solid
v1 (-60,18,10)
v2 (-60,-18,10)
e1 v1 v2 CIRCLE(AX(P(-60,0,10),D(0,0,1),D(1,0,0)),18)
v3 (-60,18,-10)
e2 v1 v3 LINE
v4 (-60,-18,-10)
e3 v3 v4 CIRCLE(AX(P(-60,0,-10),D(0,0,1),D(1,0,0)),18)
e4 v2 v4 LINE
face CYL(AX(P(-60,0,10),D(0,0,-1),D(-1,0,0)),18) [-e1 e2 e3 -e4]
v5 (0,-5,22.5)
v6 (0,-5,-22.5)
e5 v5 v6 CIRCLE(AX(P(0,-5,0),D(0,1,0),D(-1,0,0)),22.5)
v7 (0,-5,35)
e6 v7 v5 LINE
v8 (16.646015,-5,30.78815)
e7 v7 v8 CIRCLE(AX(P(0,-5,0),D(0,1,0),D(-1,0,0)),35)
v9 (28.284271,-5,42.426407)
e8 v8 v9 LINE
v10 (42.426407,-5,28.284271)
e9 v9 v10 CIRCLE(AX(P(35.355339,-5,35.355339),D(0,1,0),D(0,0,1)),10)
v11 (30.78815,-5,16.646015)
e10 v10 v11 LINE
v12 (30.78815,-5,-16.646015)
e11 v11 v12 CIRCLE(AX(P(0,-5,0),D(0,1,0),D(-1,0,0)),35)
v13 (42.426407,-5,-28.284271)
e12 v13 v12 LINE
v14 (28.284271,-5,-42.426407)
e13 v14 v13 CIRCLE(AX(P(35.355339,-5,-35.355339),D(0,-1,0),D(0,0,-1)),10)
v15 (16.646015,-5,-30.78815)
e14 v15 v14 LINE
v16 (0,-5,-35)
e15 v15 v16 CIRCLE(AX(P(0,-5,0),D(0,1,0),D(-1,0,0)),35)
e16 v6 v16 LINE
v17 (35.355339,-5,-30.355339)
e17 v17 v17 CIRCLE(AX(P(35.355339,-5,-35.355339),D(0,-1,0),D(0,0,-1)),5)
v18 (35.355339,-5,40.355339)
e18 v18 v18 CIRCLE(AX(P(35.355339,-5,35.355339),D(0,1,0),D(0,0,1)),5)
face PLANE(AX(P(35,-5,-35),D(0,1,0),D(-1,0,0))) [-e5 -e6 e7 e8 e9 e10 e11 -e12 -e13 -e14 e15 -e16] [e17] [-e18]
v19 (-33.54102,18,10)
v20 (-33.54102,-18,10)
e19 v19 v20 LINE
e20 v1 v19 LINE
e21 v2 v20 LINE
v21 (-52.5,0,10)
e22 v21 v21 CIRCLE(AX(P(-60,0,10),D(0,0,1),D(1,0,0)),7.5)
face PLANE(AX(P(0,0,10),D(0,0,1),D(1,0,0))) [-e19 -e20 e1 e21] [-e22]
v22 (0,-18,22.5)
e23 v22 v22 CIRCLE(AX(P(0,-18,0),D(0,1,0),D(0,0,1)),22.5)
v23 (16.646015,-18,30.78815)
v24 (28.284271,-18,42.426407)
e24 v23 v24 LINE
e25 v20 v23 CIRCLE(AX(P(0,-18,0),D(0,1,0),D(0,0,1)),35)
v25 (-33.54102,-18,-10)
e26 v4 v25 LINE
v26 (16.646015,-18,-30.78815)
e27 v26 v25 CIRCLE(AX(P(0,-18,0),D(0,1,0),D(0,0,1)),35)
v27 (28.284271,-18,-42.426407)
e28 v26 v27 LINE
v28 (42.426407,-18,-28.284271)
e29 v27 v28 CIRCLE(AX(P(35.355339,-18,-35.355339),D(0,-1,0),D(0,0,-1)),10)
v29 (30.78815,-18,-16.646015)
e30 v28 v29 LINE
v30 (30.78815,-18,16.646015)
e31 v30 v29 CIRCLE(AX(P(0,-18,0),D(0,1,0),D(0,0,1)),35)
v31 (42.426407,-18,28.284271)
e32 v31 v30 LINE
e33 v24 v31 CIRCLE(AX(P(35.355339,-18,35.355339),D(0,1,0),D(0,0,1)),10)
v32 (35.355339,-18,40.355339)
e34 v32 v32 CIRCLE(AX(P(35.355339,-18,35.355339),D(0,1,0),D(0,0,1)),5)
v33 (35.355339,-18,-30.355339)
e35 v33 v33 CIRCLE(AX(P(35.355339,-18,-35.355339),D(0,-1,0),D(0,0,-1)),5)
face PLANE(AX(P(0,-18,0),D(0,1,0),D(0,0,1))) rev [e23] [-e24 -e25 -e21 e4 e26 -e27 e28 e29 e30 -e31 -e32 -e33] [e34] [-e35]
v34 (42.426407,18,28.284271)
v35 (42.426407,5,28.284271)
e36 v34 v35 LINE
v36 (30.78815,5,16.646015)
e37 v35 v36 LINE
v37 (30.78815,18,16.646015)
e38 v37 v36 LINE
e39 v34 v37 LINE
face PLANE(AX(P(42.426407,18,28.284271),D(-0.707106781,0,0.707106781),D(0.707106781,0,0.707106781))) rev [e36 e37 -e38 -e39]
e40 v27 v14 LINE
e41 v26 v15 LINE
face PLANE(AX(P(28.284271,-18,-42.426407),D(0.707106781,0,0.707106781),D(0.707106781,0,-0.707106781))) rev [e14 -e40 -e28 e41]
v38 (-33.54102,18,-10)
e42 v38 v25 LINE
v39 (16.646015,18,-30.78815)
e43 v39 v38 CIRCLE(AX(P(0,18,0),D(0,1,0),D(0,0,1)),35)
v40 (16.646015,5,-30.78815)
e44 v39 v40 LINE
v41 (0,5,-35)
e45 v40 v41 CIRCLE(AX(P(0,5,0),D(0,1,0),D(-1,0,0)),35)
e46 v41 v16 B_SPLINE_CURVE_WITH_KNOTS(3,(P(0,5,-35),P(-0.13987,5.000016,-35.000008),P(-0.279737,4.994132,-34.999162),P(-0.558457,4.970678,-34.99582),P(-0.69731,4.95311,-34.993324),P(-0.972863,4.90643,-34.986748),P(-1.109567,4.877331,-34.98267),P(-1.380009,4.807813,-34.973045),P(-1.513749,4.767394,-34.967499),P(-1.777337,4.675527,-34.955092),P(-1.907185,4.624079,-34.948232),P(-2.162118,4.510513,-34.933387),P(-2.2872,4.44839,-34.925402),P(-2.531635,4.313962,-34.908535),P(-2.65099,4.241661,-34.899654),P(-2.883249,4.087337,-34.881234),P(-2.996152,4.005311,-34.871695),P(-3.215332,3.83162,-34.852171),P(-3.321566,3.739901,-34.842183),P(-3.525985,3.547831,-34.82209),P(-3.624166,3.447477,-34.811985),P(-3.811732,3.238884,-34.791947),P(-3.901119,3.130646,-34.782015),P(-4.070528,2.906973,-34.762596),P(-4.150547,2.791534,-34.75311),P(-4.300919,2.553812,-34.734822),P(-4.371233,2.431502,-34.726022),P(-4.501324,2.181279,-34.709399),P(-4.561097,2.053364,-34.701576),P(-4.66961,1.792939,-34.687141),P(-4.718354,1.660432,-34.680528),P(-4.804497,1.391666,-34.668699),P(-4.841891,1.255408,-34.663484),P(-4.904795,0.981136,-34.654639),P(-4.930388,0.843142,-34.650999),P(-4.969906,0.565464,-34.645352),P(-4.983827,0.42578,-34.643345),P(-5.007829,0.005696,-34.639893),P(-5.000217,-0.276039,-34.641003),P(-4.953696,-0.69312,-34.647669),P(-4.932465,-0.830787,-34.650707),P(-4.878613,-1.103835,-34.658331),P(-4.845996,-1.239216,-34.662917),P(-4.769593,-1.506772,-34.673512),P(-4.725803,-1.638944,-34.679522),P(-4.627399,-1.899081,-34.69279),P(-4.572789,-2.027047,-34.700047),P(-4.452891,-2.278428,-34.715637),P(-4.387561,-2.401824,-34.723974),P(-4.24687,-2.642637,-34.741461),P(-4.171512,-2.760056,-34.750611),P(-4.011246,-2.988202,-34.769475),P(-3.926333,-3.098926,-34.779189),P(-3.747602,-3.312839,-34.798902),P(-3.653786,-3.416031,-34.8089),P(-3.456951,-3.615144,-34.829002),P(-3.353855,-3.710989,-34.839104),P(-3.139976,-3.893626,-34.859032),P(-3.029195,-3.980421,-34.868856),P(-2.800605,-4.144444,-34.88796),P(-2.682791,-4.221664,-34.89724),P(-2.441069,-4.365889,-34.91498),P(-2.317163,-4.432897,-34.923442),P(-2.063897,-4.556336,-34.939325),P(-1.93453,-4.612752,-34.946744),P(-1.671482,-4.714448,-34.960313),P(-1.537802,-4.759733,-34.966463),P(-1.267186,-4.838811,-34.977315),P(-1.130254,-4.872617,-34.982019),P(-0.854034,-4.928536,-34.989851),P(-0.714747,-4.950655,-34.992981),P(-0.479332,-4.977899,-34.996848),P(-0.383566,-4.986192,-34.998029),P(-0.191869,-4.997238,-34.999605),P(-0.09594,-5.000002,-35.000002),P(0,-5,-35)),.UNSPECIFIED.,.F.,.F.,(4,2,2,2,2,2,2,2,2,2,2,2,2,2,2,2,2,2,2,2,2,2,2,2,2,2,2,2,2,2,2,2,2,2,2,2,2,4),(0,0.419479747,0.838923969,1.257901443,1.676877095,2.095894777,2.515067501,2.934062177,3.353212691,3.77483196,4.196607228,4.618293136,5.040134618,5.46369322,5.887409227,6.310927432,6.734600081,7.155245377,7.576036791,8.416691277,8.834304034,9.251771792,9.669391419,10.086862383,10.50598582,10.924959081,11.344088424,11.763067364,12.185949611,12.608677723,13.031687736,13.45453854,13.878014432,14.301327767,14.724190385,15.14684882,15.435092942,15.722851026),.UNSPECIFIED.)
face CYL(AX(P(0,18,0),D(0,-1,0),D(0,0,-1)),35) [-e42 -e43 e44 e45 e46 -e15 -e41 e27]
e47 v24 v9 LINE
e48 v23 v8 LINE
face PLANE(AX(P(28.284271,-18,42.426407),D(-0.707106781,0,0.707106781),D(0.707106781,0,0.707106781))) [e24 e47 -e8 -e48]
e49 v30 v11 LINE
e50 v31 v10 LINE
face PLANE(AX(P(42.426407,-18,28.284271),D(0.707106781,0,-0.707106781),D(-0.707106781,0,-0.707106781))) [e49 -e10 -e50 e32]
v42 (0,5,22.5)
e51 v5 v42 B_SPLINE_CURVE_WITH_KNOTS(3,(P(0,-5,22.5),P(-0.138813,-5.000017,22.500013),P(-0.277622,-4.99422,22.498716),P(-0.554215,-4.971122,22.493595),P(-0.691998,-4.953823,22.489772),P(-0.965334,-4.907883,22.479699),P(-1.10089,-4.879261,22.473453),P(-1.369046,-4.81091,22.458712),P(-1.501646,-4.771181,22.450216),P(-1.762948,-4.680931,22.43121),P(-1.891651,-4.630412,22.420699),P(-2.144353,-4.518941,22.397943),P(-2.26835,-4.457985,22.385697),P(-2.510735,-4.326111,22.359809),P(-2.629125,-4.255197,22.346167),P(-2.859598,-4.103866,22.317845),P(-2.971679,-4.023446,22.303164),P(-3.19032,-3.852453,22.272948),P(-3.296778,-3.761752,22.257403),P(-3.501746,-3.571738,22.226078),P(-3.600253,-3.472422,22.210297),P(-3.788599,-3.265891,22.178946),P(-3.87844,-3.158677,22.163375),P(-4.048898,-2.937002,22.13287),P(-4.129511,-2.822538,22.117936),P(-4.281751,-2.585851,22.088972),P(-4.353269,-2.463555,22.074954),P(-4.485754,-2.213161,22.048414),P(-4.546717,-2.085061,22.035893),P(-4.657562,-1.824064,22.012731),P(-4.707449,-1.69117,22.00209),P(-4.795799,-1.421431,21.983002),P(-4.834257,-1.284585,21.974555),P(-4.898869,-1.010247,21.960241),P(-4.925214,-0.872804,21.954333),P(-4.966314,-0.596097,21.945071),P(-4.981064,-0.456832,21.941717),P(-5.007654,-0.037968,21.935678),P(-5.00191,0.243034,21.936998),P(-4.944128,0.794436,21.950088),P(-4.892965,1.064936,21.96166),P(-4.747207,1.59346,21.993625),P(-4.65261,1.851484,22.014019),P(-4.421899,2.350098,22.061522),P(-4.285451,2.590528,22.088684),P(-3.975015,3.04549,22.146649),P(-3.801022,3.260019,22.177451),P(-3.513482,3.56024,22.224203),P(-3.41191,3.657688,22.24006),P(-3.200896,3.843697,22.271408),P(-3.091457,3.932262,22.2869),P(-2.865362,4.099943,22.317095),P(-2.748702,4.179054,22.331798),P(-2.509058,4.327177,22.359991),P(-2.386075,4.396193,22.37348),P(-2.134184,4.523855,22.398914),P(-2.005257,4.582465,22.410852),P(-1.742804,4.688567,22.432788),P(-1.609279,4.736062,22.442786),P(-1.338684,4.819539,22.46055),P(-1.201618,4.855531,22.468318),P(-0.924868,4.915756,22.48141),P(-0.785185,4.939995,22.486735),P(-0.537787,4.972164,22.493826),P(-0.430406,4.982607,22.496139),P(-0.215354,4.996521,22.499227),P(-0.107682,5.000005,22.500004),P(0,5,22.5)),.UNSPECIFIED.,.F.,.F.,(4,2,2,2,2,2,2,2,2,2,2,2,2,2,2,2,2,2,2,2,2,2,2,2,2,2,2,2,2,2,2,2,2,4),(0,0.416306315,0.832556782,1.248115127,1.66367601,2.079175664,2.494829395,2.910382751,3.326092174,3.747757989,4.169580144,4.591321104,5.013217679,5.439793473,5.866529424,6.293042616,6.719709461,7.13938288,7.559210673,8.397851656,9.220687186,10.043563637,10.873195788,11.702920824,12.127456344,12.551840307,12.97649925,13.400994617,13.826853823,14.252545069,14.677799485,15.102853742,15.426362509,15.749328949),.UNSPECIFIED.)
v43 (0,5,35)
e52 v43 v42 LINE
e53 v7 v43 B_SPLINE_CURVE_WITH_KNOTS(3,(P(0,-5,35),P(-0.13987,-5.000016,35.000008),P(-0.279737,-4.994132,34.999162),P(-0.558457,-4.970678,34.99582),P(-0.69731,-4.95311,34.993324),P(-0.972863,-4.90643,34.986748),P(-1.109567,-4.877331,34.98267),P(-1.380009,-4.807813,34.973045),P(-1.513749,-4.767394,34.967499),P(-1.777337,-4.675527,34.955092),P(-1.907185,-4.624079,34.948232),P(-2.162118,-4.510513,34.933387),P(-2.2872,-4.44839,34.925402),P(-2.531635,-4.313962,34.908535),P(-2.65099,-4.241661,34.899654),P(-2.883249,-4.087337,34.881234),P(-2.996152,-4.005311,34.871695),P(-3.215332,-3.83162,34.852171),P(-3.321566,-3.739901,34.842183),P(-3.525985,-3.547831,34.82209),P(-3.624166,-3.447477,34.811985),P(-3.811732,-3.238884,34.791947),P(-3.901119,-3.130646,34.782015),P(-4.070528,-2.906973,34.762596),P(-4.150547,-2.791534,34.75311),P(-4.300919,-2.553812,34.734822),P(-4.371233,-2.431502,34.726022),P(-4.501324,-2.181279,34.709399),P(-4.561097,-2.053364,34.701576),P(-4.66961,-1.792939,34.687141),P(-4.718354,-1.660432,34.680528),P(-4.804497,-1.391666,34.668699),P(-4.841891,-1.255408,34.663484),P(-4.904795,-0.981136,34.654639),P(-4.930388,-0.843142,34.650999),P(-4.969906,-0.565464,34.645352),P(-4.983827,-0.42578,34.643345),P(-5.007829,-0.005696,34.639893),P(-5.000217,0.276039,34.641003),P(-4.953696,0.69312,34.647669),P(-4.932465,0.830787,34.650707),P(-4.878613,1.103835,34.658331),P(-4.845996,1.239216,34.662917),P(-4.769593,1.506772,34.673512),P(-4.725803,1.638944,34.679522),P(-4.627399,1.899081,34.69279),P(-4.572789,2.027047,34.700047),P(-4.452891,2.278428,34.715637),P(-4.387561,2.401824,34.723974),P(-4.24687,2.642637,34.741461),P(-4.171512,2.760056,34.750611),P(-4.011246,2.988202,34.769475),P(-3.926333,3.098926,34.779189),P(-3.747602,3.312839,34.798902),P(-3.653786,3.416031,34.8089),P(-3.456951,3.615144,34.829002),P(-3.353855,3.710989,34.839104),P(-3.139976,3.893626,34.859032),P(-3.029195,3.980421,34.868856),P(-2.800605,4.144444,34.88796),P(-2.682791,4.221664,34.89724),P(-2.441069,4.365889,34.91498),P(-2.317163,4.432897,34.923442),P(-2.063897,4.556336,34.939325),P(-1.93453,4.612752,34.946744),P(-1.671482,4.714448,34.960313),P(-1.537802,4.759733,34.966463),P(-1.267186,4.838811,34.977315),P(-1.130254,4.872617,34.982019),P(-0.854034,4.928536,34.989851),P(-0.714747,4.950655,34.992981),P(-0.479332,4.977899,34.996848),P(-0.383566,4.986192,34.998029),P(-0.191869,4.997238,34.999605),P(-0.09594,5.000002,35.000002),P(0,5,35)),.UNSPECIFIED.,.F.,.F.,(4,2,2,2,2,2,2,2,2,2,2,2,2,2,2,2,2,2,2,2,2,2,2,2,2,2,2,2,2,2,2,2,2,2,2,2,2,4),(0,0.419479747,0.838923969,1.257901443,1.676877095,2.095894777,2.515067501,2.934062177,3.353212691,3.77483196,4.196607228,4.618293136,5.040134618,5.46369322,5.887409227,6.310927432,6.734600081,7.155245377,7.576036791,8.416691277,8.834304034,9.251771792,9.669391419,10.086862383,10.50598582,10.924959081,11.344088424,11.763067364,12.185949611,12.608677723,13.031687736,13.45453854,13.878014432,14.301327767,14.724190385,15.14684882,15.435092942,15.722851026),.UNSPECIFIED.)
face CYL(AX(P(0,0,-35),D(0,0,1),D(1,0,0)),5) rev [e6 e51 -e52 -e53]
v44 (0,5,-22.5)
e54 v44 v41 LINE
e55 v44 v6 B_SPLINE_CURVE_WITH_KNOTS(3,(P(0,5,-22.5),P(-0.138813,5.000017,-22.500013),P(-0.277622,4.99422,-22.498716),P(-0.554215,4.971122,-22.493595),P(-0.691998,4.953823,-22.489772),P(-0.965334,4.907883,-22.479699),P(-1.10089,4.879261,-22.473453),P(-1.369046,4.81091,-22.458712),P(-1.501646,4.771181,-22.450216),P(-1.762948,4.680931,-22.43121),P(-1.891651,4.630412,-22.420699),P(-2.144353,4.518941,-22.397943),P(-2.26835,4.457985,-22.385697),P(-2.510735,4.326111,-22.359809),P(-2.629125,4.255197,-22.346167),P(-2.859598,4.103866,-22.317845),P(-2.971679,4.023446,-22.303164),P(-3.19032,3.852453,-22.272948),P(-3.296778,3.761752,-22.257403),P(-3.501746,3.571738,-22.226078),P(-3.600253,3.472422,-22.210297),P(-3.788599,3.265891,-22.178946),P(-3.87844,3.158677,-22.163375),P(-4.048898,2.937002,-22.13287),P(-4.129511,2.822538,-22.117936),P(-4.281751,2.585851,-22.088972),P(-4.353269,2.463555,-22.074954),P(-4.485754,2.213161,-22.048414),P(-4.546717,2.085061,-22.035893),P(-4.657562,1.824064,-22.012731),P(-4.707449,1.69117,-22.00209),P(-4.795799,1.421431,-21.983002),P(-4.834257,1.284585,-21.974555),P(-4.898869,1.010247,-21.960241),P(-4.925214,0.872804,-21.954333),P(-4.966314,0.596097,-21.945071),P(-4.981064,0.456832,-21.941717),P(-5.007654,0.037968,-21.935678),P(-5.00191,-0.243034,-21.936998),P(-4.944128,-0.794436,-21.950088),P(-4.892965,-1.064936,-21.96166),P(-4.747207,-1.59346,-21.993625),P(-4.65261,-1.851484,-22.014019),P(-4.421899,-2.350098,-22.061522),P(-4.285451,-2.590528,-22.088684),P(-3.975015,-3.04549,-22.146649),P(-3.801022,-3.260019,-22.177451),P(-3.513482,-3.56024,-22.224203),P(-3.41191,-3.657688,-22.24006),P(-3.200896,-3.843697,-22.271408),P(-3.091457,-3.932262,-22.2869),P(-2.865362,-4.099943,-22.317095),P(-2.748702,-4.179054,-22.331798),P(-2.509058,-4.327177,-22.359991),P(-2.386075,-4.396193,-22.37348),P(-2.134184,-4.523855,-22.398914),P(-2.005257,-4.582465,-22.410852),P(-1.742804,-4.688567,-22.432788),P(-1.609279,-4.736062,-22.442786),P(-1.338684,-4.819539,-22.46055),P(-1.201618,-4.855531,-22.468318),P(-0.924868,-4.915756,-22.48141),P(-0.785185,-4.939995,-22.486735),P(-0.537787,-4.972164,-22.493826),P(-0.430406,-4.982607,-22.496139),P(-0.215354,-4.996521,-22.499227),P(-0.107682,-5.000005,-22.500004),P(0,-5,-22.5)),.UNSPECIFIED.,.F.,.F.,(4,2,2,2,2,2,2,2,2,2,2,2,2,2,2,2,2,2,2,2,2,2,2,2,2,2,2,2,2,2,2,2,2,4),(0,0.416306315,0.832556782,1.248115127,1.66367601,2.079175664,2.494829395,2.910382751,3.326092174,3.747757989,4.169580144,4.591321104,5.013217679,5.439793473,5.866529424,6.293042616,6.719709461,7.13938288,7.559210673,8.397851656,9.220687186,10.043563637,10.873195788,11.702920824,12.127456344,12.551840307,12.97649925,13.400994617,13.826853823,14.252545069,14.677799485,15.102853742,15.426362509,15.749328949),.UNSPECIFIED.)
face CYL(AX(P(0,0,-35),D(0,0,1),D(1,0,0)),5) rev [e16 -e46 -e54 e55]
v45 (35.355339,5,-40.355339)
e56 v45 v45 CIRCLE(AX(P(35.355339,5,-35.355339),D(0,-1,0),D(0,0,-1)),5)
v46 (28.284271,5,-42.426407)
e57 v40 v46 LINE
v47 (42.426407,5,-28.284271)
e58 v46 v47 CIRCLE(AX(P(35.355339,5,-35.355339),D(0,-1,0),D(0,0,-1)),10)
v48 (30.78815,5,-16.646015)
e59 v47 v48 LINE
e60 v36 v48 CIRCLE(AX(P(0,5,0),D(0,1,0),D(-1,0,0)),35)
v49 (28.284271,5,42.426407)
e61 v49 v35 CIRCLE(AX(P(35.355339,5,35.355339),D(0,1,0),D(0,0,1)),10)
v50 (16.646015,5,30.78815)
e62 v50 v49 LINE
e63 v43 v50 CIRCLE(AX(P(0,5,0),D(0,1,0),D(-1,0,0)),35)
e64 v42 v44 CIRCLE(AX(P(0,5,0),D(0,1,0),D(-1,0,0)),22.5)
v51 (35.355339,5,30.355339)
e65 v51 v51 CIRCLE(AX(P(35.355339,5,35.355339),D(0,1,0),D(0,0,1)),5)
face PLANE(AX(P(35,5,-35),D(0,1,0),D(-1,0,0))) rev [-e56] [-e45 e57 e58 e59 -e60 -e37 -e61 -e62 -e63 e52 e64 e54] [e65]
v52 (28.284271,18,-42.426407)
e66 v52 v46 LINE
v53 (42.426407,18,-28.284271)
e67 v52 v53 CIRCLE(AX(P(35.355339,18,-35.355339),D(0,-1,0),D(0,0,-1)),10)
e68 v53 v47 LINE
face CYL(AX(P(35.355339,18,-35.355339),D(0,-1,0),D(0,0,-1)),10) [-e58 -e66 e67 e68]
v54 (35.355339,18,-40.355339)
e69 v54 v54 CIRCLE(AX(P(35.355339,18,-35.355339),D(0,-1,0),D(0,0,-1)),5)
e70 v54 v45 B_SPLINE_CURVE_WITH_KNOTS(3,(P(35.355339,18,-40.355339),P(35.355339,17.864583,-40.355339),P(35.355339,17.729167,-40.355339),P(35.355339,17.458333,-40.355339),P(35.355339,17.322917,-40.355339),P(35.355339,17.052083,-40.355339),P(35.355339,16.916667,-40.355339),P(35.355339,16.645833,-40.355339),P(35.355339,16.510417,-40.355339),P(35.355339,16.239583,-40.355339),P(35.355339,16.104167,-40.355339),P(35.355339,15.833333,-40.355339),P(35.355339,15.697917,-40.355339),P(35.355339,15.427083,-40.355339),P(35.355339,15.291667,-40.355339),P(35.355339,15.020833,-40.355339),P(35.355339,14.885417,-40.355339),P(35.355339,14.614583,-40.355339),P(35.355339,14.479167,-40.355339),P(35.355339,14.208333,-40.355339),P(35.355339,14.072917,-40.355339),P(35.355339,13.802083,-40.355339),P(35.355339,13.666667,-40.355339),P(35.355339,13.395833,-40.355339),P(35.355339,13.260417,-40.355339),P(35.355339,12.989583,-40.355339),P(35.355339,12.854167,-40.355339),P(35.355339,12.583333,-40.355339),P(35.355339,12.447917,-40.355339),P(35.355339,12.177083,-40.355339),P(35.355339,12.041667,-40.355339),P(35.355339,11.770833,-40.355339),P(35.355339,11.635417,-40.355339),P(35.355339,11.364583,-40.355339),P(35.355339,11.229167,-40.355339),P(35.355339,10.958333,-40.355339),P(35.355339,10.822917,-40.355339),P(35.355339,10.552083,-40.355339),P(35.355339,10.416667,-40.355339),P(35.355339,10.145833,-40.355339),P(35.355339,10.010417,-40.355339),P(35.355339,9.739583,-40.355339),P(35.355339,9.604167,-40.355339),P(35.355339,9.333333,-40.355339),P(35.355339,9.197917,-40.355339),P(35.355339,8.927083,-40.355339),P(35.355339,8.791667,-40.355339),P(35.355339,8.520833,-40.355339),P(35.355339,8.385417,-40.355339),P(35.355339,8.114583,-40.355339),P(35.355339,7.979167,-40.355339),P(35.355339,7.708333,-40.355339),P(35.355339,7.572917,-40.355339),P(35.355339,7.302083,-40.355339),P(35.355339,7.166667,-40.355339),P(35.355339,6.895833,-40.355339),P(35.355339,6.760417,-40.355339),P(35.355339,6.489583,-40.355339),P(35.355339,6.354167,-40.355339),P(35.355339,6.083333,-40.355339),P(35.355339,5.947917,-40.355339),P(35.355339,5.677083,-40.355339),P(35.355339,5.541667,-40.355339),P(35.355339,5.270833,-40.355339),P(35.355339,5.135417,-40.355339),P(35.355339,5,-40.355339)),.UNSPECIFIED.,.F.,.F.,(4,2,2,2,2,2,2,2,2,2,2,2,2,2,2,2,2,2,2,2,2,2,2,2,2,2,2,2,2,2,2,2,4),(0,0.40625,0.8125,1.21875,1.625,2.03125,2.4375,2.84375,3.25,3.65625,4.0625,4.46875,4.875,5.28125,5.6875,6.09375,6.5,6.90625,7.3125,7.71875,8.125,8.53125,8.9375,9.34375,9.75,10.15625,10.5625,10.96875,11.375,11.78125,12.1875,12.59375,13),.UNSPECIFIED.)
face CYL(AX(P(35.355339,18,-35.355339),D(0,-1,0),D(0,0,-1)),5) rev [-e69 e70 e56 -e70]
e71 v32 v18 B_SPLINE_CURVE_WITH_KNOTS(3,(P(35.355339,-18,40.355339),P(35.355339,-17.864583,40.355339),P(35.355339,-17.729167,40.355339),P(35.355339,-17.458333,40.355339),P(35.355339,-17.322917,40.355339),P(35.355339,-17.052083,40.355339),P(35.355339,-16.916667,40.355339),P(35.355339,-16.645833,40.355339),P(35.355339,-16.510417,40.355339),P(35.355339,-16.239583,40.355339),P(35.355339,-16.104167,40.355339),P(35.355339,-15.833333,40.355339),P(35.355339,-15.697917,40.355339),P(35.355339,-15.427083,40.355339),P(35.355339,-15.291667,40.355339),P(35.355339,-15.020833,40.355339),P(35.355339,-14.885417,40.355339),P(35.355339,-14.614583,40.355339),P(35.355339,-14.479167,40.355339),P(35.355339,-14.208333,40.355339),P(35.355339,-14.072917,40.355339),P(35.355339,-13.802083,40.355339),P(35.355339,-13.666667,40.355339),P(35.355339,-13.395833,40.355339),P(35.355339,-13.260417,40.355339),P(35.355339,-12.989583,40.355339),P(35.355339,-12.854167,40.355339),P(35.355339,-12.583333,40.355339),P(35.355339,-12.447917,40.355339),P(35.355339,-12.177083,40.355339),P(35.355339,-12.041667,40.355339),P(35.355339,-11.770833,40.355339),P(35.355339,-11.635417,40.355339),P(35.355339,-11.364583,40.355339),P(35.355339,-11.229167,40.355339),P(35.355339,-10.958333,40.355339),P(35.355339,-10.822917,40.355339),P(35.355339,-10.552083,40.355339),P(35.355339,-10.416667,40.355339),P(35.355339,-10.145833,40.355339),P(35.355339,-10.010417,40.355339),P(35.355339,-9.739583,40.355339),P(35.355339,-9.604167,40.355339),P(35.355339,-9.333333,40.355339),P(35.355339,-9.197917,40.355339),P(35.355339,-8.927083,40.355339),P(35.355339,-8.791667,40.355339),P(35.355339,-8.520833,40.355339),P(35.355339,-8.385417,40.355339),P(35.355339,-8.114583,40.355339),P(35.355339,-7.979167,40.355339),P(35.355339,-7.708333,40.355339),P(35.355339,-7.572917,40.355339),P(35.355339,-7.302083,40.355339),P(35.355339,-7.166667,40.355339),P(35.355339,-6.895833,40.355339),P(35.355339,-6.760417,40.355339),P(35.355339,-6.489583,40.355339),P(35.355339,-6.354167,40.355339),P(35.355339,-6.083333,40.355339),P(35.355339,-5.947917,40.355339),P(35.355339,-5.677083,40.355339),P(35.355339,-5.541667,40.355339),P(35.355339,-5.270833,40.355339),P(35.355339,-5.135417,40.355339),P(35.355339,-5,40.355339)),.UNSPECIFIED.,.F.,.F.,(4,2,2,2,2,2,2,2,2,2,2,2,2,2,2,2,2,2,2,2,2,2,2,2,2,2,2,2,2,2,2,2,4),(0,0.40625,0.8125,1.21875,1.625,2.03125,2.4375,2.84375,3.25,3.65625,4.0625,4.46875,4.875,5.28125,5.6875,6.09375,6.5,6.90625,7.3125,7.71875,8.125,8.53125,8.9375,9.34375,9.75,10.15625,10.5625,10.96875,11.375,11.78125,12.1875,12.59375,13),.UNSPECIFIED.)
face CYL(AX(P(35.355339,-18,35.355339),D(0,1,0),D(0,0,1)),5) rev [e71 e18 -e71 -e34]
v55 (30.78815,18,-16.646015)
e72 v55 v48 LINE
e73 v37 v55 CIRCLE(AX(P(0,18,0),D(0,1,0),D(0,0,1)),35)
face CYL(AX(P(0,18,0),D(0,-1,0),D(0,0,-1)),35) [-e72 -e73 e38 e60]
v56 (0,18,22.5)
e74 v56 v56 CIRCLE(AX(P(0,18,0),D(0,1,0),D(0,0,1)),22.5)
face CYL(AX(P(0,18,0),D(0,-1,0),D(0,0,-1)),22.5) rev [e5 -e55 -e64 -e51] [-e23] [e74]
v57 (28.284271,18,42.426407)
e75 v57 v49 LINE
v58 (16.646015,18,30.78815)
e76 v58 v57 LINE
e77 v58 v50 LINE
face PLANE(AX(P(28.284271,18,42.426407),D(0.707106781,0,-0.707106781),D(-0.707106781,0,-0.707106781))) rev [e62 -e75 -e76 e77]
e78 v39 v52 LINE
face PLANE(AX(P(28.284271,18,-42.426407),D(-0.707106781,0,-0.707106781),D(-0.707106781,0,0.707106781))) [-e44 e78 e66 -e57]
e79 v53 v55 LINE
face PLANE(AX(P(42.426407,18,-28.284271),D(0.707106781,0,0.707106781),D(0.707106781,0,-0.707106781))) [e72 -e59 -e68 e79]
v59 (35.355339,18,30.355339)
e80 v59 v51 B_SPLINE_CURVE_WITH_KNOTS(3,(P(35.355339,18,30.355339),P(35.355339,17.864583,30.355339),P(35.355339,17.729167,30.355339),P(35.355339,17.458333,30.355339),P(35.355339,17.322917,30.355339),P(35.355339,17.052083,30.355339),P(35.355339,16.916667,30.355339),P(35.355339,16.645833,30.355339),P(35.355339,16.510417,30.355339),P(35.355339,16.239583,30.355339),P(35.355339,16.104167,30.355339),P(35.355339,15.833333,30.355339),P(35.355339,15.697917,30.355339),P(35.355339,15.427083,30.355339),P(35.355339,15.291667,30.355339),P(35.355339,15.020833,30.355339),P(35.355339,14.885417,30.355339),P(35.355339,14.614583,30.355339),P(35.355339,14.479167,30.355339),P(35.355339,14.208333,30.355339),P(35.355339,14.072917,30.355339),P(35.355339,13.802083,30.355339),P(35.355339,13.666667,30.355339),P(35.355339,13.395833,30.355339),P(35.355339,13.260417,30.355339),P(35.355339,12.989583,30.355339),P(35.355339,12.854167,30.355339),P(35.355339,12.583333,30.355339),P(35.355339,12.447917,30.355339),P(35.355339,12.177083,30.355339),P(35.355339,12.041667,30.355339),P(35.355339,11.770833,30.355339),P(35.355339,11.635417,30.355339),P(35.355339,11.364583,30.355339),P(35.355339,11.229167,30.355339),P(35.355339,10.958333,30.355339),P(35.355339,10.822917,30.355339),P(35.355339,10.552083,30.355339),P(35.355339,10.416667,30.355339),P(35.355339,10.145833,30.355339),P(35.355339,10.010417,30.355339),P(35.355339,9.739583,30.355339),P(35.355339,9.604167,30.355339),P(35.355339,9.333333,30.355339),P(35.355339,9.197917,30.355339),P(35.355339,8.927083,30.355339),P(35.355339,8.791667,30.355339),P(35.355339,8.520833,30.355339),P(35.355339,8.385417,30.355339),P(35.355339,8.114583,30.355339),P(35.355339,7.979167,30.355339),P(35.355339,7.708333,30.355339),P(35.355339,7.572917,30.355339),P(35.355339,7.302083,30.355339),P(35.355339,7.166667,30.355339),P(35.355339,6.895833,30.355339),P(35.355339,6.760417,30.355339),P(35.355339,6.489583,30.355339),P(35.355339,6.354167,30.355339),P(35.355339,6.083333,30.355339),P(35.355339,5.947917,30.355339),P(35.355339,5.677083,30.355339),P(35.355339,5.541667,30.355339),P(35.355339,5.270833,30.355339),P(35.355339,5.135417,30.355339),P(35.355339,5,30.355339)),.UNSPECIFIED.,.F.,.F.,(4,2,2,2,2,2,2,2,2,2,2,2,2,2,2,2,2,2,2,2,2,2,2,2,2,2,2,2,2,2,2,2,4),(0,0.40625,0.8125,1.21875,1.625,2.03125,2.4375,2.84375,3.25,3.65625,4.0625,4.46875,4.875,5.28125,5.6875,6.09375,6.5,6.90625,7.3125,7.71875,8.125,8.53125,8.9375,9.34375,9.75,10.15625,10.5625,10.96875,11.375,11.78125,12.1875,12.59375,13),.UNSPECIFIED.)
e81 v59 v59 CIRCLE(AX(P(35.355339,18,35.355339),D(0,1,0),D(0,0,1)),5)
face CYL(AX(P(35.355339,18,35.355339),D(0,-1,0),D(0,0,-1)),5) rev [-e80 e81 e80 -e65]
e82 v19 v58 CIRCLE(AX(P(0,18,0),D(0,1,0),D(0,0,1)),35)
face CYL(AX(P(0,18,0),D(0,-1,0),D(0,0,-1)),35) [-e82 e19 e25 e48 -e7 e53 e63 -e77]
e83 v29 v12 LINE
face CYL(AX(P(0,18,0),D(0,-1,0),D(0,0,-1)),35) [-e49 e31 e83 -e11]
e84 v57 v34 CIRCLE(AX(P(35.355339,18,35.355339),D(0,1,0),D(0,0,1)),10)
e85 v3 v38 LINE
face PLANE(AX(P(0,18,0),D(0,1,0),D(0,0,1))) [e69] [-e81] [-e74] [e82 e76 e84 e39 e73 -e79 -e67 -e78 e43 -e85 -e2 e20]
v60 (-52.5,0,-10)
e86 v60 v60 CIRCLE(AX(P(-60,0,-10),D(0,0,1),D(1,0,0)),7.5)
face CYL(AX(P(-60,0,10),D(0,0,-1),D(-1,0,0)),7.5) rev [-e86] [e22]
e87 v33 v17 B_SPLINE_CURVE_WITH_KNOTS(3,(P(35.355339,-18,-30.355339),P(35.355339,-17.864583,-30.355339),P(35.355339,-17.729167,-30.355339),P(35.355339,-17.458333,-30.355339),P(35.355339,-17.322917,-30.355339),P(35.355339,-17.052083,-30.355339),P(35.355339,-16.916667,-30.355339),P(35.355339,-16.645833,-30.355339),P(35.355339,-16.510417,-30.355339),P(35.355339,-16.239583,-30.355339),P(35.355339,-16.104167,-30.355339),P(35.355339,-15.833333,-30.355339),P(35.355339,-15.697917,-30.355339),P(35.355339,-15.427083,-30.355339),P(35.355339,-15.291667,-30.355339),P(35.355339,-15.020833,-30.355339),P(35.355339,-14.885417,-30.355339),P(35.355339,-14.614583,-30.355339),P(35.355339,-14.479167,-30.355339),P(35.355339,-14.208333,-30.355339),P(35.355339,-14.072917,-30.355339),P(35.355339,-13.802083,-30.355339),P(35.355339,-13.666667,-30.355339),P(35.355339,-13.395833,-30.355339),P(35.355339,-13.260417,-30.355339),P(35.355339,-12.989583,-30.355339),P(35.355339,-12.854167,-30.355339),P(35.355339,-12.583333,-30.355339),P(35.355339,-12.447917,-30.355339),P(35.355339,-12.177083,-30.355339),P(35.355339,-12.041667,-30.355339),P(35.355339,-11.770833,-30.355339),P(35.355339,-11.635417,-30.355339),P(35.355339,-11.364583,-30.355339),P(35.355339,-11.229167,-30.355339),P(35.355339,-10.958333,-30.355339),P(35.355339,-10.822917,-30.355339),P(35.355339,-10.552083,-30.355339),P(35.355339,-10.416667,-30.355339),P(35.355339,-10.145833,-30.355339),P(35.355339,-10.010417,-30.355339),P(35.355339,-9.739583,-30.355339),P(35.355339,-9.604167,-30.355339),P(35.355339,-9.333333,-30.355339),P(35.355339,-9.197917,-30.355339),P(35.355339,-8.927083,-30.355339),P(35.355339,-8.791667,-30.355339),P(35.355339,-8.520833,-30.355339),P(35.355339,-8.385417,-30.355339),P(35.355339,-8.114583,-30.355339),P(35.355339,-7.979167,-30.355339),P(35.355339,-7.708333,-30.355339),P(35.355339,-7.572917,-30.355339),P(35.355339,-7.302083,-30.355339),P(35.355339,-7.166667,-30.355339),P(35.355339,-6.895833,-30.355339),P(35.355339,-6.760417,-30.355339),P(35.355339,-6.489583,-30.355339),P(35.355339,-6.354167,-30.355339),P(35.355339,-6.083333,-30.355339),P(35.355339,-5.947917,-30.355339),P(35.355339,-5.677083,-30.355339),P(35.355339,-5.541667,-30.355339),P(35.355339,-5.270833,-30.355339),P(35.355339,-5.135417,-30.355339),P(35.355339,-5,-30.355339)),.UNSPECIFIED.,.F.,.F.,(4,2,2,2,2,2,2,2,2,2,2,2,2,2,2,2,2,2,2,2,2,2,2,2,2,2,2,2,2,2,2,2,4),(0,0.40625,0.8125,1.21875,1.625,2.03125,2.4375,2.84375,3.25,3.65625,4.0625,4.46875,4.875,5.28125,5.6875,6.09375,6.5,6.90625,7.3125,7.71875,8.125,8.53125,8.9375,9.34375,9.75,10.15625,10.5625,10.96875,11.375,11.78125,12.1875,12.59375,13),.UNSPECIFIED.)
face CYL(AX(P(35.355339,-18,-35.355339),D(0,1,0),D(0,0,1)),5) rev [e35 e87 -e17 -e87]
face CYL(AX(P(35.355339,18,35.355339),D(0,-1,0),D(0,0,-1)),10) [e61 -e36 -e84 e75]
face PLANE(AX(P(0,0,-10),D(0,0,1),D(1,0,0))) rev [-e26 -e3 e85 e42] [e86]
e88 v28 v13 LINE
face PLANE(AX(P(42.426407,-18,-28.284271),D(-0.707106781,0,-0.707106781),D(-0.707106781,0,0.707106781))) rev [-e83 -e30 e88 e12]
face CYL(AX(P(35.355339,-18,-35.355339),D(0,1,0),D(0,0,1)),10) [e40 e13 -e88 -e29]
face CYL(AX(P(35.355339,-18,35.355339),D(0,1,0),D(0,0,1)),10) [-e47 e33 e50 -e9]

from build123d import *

# Parameters (mm, degrees)
SKETCH1_R               = 35
SKETCH1_R_2             = 22.5
BOSS_EXTRUDE1_DEPTH     = 18
CUT_EXTRUDE1_DEPTH      = 53.668776329
CUT_EXTRUDE1_DEPTH_BACK = 53.668776329
SKETCH2_R               = 5
SKETCH2_W               = 35
SKETCH2_H               = 10
BOSS_EXTRUDE2_START     = 18
SKETCH3_R               = 5
BOSS_EXTRUDE2_DEPTH     = 13
MIRROR2_START           = 18
MIRROR2_COPY_1_SKETCH_R = 5
MIRROR2_COPY_1_DEPTH    = 13
BOSS_EXTRUDE4_DEPTH     = 10


with BuildPart() as part:
    # Sketch1 → Boss-Extrude1 (new, symmetric)
    with BuildSketch(Plane(origin=(0, 0, 0), x_dir=(1, 0, 0), z_dir=(0, 1, 0))):
        Circle(SKETCH1_R)
        Circle(SKETCH1_R_2, mode=Mode.SUBTRACT)
    extrude(amount=BOSS_EXTRUDE1_DEPTH, both=True)

    # Sketch2 → Cut-Extrude1 (cut, two sides: drawn at the far end of the back side and taken through both)
    with BuildSketch(Plane.XY.offset(-CUT_EXTRUDE1_DEPTH_BACK)):
        Circle(SKETCH2_R)
        with Locations((17.5, 0)):
            Rectangle(SKETCH2_W, SKETCH2_H)
    extrude(amount=CUT_EXTRUDE1_DEPTH + CUT_EXTRUDE1_DEPTH_BACK, mode=Mode.SUBTRACT)

    # Sketch3 → Boss-Extrude2 (add)
    with BuildSketch(Plane(origin=(0, 0, 0), x_dir=(1, 0, 0), z_dir=(0, 1, 0)).offset(BOSS_EXTRUDE2_START)):
        with BuildLine():
            Line((28.284271247, -42.426406871), (16.646014639, -30.788150263))
            ThreePointArc((16.646014639, -30.788150263), (24.748737342, -24.748737342), (30.788150263, -16.646014639))
            Line((30.788150263, -16.646014639), (42.426406871, -28.284271247))
            ThreePointArc((42.426406871, -28.284271247), (42.426406871, -42.426406871), (28.284271247, -42.426406871))
        make_face()
        with Locations((35.355339059, -35.355339059)):
            Circle(SKETCH3_R, mode=Mode.SUBTRACT)
    boss_extrude2 = extrude(amount=-BOSS_EXTRUDE2_DEPTH)

    # Mirror1: Boss-Extrude2 across plane
    add(boss_extrude2.mirror(Plane.XY))

    # Mirror2: Boss-Extrude2 across plane
    add(boss_extrude2.mirror(Plane.ZX))

    # Mirror2 copy 1 sketch → Mirror2 copy 1 (add)
    with BuildSketch(Plane.XZ.offset(MIRROR2_START)):
        with BuildLine():
            Line((28.284271247, -42.426406871), (16.646014639, -30.788150263))
            ThreePointArc((16.646014639, -30.788150263), (24.748737342, -24.748737342), (30.788150263, -16.646014639))
            Line((30.788150263, -16.646014639), (42.426406871, -28.284271247))
            ThreePointArc((42.426406871, -28.284271247), (42.426406871, -42.426406871), (28.284271247, -42.426406871))
        make_face()
        with Locations((35.355339059, -35.355339059)):
            Circle(MIRROR2_COPY_1_SKETCH_R, mode=Mode.SUBTRACT)
    extrude(amount=-MIRROR2_COPY_1_DEPTH)

    # Sketch4 → Boss-Extrude4 (add, symmetric)
    with BuildSketch(Plane.XY):
        with BuildLine():
            Line((-22.5, 18), (-60, 18))
            ThreePointArc((-60, 18), (-78, 0), (-60, -18))
            Line((-60, -18), (-22.5, -18))
            Line((-22.5, -18), (-22.5, 18))
        make_face()
        with BuildLine():
            ThreePointArc((-67.5, 0), (-60, 7.5), (-52.5, 0))
            ThreePointArc((-52.5, 0), (-60, -7.5), (-67.5, 0))
        make_face(mode=Mode.SUBTRACT)
    extrude(amount=BOSS_EXTRUDE4_DEPTH, both=True)


solid = part.part
